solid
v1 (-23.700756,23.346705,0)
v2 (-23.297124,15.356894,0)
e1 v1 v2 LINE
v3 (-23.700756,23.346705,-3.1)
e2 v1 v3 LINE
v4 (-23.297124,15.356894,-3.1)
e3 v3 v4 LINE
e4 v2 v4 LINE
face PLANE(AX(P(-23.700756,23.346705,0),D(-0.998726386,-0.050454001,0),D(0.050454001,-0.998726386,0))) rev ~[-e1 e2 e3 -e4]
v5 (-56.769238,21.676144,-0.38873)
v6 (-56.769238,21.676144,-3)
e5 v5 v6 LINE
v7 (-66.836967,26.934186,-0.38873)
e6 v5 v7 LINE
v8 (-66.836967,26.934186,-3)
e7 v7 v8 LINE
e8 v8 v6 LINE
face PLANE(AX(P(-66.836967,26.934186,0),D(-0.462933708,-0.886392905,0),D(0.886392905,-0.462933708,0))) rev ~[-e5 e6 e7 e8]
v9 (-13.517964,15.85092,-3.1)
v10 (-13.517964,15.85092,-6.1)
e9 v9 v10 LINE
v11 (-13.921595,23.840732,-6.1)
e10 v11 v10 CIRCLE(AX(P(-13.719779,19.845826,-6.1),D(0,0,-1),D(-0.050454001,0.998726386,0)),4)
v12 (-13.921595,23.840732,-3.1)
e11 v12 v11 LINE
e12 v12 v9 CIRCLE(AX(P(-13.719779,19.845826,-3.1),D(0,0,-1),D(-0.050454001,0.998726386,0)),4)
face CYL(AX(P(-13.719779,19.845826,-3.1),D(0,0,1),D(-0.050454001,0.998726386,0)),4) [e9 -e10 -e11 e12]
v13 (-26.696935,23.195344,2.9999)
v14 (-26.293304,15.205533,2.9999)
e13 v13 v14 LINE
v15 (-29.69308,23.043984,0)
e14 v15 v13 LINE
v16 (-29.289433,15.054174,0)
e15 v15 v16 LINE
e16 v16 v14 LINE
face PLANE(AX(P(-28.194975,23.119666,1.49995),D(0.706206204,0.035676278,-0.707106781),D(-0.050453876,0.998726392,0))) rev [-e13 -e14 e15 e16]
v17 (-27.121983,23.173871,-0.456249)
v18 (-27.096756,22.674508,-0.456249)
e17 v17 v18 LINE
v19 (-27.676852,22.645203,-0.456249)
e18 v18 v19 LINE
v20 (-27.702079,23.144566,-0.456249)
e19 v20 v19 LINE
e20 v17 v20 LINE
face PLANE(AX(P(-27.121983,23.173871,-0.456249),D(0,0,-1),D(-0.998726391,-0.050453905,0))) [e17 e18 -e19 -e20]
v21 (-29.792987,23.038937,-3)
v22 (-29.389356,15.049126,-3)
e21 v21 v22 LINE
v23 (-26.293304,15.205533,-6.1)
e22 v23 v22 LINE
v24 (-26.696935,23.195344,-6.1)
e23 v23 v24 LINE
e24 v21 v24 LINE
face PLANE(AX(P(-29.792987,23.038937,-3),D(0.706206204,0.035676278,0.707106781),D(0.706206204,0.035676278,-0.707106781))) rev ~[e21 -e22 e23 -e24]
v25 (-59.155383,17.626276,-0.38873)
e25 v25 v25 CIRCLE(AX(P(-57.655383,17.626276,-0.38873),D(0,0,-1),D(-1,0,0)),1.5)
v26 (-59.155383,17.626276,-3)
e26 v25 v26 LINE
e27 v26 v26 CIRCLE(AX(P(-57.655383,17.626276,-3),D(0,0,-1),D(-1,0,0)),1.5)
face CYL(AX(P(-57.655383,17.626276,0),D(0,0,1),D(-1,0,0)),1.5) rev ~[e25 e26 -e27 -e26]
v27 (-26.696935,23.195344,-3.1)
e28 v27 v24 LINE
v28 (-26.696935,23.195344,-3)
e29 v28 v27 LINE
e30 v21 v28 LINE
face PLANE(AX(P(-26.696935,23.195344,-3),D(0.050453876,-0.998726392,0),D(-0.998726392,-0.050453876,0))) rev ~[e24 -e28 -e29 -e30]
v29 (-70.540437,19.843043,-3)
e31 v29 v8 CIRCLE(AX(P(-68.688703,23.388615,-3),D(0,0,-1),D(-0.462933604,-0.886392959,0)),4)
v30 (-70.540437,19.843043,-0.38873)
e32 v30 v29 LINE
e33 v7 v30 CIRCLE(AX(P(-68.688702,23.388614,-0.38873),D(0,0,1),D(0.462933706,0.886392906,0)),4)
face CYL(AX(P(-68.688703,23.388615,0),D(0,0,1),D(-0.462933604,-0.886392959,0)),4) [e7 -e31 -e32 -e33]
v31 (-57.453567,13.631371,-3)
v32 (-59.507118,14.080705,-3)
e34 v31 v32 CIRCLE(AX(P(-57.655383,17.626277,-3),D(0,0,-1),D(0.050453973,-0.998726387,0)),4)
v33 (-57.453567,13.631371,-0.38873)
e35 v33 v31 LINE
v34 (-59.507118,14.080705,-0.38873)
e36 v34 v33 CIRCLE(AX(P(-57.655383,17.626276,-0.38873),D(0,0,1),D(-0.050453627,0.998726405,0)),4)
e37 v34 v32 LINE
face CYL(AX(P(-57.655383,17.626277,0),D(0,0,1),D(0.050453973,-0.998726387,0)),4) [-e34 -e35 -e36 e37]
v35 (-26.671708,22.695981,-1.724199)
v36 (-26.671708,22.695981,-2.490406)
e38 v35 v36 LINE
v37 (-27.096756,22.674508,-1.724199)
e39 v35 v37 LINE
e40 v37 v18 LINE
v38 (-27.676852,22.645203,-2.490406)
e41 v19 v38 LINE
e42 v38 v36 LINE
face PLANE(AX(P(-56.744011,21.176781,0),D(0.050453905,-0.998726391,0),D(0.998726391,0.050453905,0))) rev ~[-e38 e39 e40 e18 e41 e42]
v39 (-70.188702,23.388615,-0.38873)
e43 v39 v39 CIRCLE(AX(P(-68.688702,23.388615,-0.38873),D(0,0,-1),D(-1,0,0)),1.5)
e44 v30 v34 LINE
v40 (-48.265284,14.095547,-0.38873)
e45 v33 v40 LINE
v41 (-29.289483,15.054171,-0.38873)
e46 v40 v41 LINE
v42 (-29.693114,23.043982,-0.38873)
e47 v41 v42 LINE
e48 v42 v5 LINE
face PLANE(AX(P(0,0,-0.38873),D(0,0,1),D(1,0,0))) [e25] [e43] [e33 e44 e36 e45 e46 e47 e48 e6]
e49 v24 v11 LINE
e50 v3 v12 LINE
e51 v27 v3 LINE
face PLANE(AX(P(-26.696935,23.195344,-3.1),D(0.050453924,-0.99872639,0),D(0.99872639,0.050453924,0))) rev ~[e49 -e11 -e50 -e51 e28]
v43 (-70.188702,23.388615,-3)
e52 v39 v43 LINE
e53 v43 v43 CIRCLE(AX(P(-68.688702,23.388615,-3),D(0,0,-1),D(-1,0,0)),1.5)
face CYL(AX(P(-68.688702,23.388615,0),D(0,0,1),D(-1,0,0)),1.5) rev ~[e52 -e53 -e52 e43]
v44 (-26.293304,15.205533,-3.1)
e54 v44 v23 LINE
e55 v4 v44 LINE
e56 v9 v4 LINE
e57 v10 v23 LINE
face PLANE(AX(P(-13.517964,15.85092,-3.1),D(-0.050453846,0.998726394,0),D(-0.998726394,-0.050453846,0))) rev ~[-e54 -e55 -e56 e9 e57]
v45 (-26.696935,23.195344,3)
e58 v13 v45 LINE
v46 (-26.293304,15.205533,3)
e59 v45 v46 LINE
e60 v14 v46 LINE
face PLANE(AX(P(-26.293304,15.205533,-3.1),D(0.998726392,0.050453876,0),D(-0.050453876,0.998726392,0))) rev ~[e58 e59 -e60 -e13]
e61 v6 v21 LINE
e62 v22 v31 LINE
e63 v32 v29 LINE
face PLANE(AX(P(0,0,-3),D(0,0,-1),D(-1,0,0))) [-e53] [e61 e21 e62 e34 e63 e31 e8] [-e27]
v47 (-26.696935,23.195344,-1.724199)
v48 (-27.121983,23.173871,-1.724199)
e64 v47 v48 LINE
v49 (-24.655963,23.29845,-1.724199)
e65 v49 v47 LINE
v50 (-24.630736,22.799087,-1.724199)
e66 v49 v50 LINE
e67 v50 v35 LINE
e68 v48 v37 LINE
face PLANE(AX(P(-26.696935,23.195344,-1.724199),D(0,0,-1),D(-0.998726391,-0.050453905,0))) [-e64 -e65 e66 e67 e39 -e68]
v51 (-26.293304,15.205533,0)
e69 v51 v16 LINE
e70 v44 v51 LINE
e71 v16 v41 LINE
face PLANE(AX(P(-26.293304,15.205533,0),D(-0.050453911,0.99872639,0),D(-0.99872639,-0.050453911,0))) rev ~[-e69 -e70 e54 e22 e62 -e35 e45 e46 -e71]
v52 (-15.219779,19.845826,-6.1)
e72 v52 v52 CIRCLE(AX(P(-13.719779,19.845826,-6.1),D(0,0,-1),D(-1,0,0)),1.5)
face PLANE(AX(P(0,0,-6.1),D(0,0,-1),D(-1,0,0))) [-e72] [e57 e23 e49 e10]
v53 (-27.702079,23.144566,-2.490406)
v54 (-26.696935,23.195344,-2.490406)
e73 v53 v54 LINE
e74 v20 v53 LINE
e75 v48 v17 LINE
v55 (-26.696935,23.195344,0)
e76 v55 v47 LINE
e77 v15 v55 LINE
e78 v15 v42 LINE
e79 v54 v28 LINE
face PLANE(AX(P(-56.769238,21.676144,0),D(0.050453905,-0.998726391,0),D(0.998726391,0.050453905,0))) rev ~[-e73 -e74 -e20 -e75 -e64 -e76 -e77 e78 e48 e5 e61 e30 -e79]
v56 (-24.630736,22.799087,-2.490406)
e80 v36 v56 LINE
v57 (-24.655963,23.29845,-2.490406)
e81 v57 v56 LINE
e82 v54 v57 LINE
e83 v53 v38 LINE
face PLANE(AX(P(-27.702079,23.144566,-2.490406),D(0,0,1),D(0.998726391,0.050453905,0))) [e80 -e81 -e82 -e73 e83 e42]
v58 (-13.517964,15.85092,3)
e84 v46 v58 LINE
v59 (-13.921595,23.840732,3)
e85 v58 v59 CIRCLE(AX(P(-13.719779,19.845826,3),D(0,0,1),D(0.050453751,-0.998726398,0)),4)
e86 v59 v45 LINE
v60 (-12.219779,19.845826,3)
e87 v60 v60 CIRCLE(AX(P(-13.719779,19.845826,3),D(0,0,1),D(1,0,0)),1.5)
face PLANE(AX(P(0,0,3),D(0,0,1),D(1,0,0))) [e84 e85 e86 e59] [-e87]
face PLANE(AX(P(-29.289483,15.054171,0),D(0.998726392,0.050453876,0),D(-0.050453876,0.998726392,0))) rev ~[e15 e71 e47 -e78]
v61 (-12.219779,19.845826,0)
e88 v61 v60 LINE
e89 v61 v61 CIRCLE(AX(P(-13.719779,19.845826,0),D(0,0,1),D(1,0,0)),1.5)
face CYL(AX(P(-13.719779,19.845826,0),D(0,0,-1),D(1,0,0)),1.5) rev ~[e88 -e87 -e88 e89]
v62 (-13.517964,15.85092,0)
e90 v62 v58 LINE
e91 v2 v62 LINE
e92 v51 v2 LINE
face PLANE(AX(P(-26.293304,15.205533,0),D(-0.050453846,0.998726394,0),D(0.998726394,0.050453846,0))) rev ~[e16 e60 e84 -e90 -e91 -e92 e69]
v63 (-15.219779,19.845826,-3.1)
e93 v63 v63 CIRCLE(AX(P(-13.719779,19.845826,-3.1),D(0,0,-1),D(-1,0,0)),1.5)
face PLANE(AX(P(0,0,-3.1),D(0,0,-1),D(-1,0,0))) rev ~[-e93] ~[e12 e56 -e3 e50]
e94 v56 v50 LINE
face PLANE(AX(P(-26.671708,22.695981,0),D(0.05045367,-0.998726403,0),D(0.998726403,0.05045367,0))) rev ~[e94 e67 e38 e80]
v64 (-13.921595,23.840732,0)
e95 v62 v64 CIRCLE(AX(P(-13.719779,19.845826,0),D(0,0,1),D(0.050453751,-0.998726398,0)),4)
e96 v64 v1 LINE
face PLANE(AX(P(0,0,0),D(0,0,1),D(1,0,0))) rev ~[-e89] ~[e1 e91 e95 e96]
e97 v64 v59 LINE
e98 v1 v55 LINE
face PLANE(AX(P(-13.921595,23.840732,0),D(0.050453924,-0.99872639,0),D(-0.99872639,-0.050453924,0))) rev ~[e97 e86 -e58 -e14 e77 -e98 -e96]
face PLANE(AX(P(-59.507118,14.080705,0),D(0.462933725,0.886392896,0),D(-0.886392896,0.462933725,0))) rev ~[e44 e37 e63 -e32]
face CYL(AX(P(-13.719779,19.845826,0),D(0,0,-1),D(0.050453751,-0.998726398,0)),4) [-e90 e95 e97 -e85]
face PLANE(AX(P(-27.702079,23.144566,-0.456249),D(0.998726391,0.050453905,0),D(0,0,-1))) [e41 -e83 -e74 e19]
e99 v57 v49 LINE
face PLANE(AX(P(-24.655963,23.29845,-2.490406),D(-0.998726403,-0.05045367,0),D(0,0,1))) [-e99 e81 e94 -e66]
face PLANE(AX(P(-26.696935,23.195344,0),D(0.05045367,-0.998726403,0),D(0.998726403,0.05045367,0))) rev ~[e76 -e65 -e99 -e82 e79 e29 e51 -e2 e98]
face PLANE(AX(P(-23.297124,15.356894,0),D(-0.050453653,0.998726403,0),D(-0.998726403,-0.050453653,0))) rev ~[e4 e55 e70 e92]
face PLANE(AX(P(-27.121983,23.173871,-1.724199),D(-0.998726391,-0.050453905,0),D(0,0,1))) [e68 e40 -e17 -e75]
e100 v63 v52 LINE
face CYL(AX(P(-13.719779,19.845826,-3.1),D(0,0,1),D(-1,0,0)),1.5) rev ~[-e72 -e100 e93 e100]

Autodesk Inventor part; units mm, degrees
ref_plane "YZ Plane" through (0, 0, 0) normal (1, 0, 0) x (0, 1, 0)
ref_plane "XZ Plane" through (0, 0, 0) normal (0, 1, 0) x (-1, 0, 0)
sketch "Sketch1" plane through (0, 0, 0) normal (0, 0, 1) x (1, 0, 0)
  line L0 (-26.293304, 15.205533) -> (-26.696935, 23.195344)
  line L1 (-26.696935, 23.195344) -> (-13.921595, 23.840732)
  arc A0 (-13.517964, 15.85092) -> (-13.921595, 23.840732) centre (-13.719779, 19.845826) ccw
  line L2 (-13.517964, 15.85092) -> (-26.293304, 15.205533)
  circle A1 centre (-13.719779, 19.845826) radius 1.5
  point P0 (0, 0)
sketch "Sketch1 outline for Extrusion1" plane through (0, 0, 0) normal (0, 0, 1) x (1, 0, 0)
  arc A0 (-13.517964, 15.85092) -> (-13.921595, 23.840732) centre (-13.719779, 19.845826) ccw
  line L0 (-26.293304, 15.205533) -> (-13.517964, 15.85092)
  line L1 (-13.921595, 23.840732) -> (-26.696935, 23.195344)
  line L2 (-26.696935, 23.195344) -> (-26.293304, 15.205533)
  circle A1 centre (-13.719779, 19.845826) radius 1.5
extrude "Extrusion1" add sketch "Sketch1 outline for Extrusion1" along normal blind 3
sketch "Sketch2" plane through (0, 0, 0) normal (0, 0, -1) x (-1, 0, 0)
  line L0 (23.700756, 23.346705) -> (23.297124, 15.356894)
  line L1 (26.696935, 23.195344) -> (26.293304, 15.205533)
  line L2 (13.921595, 23.840732) -> (26.696935, 23.195344)
  arc A0 (13.921595, 23.840732) -> (13.517964, 15.85092) centre (13.719779, 19.845826) ccw
  line L3 (26.293304, 15.205533) -> (13.517964, 15.85092)
  line L4 (26.696935, 23.195344) -> (26.293304, 15.205533)
  circle A1 centre (13.719779, 19.845826) radius 1.5
  point P0 (0, 0)
sketch "Sketch2 outline for Extrusion2" plane through (0, 0, 0) normal (0, 0, -1) x (-1, 0, 0)
  line L0 (23.297124, 15.356894) -> (26.293304, 15.205533)
  line L1 (23.700756, 23.346705) -> (23.297124, 15.356894)
  line L2 (26.696935, 23.195344) -> (23.700756, 23.346705)
  line L3 (26.293304, 15.205533) -> (26.696935, 23.195344)
extrude "Extrusion2" add sketch "Sketch2 outline for Extrusion2" along normal blind 3.1
sketch "Sketch3" plane through (0, 0, -3.1) normal (0, 0, -1) x (-1, 0, 0)
  line L0 (13.921595, 23.840732) -> (26.696935, 23.195344)
  line L1 (26.696935, 23.195344) -> (26.293304, 15.205533)
  line L2 (26.293304, 15.205533) -> (13.517964, 15.85092)
  arc A0 (13.921595, 23.840732) -> (13.517964, 15.85092) centre (13.719779, 19.845826) ccw
  circle A1 centre (13.719779, 19.845826) radius 1.5
  point P0 (0, 0)
sketch "Sketch3 outline for Extrusion3" plane through (0, 0, -3.1) normal (0, 0, -1) x (-1, 0, 0)
  arc A0 (13.921595, 23.840732) -> (13.517964, 15.85092) centre (13.719779, 19.845826) ccw
  line L0 (26.696935, 23.195344) -> (13.921595, 23.840732)
  line L1 (13.517964, 15.85092) -> (26.293304, 15.205533)
  line L2 (26.293304, 15.205533) -> (26.696935, 23.195344)
  circle A1 centre (13.719779, 19.845826) radius 1.5
extrude "Extrusion3" add sketch "Sketch3 outline for Extrusion3" along normal blind 3
sketch "Sketch4" plane through (0, 0, 0) normal (0, 0, -1) x (-1, 0, 0)
  arc A0 (57.453567, 13.631371) -> (57.857198, 21.621182) centre (57.655383, 17.626276) ccw
  line L0 (57.453567, 13.631371) -> (29.389355, 15.049125)
  line L1 (29.792987, 23.038937) -> (29.389355, 15.049125)
  line L2 (29.792987, 23.038937) -> (57.857198, 21.621182)
  circle A1 centre (57.655383, 17.626276) radius 1.5
  line L3 (29.389355, 15.049125) -> (26.293304, 15.205533)
  line L4 (26.696935, 23.195344) -> (26.293304, 15.205533)
  line L5 (26.696935, 23.195344) -> (29.792987, 23.038937)
  line L6 (29.792987, 23.038937) -> (29.389355, 15.049125)
  circle A2 centre (68.688702, 23.388615) radius 1.5
  arc A3 (70.540437, 19.843043) -> (66.836967, 26.934186) centre (68.688702, 23.388615) ccw
  line L7 (59.507118, 14.080705) -> (70.540437, 19.843043)
  arc A4 (57.453567, 13.631371) -> (57.857198, 21.621182) centre (57.655383, 17.626276) ccw
  line L8 (56.769238, 21.676144) -> (66.836967, 26.934186)
  point P0 (0, 0)
  dimension "d18" = 8
sketch "Sketch4 outline for Extrusion4" plane through (0, 0, 0) normal (0, 0, -1) x (-1, 0, 0)
  line L0 (26.696935, 23.195344) -> (26.293304, 15.205533)
  line L1 (26.293304, 15.205533) -> (57.453567, 13.631371)
  arc A0 (57.453567, 13.631371) -> (59.507118, 14.080705) centre (57.655383, 17.626276) ccw
  line L2 (59.507118, 14.080705) -> (70.540437, 19.843043)
  arc A1 (70.540437, 19.843043) -> (66.836967, 26.934186) centre (68.688702, 23.388615) ccw
  line L3 (66.836967, 26.934186) -> (56.769238, 21.676144)
  line L4 (56.769238, 21.676144) -> (26.696935, 23.195344)
  circle A2 centre (57.655383, 17.626276) radius 1.5
  circle A3 centre (68.688702, 23.388615) radius 1.5
extrude "Extrusion4" add sketch "Sketch4 outline for Extrusion4" along normal blind 3
chamfer "Chamfer1" distance 3 angle 45 1 edges at (-26.4951, 19.2004, 0)
chamfer "Chamfer2" distance 3.1 angle 45 1 edges at (-26.4951, 19.2004, -3)
ref_plane "Work Plane1" through (-62.942605, 1.312432, -0.38873) normal (0, 0, -1) x (-0.0504539, 0.9987264, 0)
sketch "Sketch6" plane through (0, 0, 0) normal (0, 0, 1) x (1, 0, 0)
  line L0 (-57.453567, 13.631371) -> (-48.265284, 14.095547)
  arc A0 (-57.857198, 21.621182) -> (-57.453567, 13.631371) centre (-57.655383, 17.626276) ccw
  line L1 (-29.693114, 23.043982) -> (-57.857198, 21.621182)
  line L2 (-29.693114, 23.043982) -> (-48.265284, 14.095547)
  circle A1 centre (-57.655383, 17.626276) radius 1.5
  point P0 (0, 0)
sketch "Sketch6 outline for Extrusion5" plane through (0, 0, 0) normal (0, 0, 1) x (1, 0, 0)
  line L0 (-29.693114, 23.043982) -> (-57.857198, 21.621182)
  line L1 (-48.265284, 14.095547) -> (-29.693114, 23.043982)
  arc A0 (-57.857198, 21.621182) -> (-57.453567, 13.631371) centre (-57.655383, 17.626276) ccw
  line L2 (-57.453567, 13.631371) -> (-48.265284, 14.095547)
  circle A1 centre (-57.655383, 17.626276) radius 1.5
extrude "Extrusion5" cut sketch "Sketch6 outline for Extrusion5" against normal up to surface (0.38873 mm away)
sketch "Sketch7" plane through (-13.921595, 23.840732, 3) normal (-0.0504539, 0.9987264, 0) x (0.9987264, 0.0504539, 0)
  line L0 (-10.748057, 5.806776) -> (-10.748057, 3.406816) construction
  line L1 (-10.748057, 3.406816) -> (-13.798057, 3.406816) construction
  line L2 (-13.798057, 3.406816) -> (-13.798057, 5.806776) construction
  line L3 (-13.798057, 5.806776) -> (-10.748057, 5.806776) construction
  line L4 (-13.798057, 3.456249) -> (-13.798057, 5.490406)
  line L5 (-13.798057, 5.490406) -> (-10.748057, 5.490406)
  line L6 (-10.748057, 5.490406) -> (-10.748057, 4.724199)
  line L7 (-10.748057, 4.724199) -> (-13.217222, 4.724199)
  line L8 (-13.217222, 4.724199) -> (-13.217222, 3.456249)
  line L9 (-13.217222, 3.456249) -> (-13.798057, 3.456249)
  point P0 (12.701006, 3)
sketch "Sketch7 outline for Emboss1" plane through (-13.921595, 23.840732, 3) normal (-0.0504539, 0.9987264, 0) x (0.9987264, 0.0504539, 0)
  line L0 (-13.798057, 3.456249) -> (-13.798057, 5.490406)
  line L1 (-13.798057, 5.490406) -> (-10.748057, 5.490406)
  line L2 (-10.748057, 5.490406) -> (-10.748057, 4.724199)
  line L3 (-10.748057, 4.724199) -> (-13.217222, 4.724199)
  line L4 (-13.217222, 4.724199) -> (-13.217222, 3.456249)
  line L5 (-13.217222, 3.456249) -> (-13.798057, 3.456249)
emboss "Emboss1" sketch "Sketch7 outline for Emboss1" operation cut depth 0.5 direction (0.0504539, -0.9987264, 0)
sketch "Sketch8" plane through (0, 0, 0) normal (0, 0, 1) x (1, 0, 0)
  line L0 (-57.857198, 21.621182) -> (-56.769238, 21.676144)
  line L1 (-66.836967, 26.934186) -> (-56.769238, 21.676144)
  arc A0 (-66.836967, 26.934186) -> (-70.540437, 19.843043) centre (-68.688702, 23.388615) ccw
  line L2 (-59.507118, 14.080705) -> (-70.540437, 19.843043)
  arc A1 (-57.857198, 21.621182) -> (-59.507118, 14.080705) centre (-57.655383, 17.626276) ccw
  circle A2 centre (-68.688702, 23.388615) radius 1.5
  point P0 (0, 0)
sketch "Sketch8 outline for Extrusion6" plane through (0, 0, 0) normal (0, 0, 1) x (1, 0, 0)
  arc A0 (-59.507118, 14.080705) -> (-57.857198, 21.621182) centre (-57.655383, 17.626276) cw
  line L0 (-70.540437, 19.843043) -> (-59.507118, 14.080705)
  line L1 (-57.857198, 21.621182) -> (-56.769238, 21.676144)
  arc A1 (-66.836967, 26.934186) -> (-70.540437, 19.843043) centre (-68.688702, 23.388615) ccw
  line L2 (-56.769238, 21.676144) -> (-66.836967, 26.934186)
  circle A2 centre (-68.688702, 23.388615) radius 1.5
extrude "Extrusion6" cut sketch "Sketch8 outline for Extrusion6" against normal up to surface (0.38873 mm away)
sketch "Sketch9" plane through (0, 0, 0) normal (0, 0, 1) x (1, 0, 0)
  line L0 (-29.693114, 23.043982) -> (-48.265284, 14.095547)
  line L1 (-29.289483, 15.054171) -> (-48.265284, 14.095547)
  line L2 (-29.693114, 23.043982) -> (-29.289483, 15.054171)
  point P0 (0, 0)
sketch "Sketch9 outline for Extrusion7" plane through (0, 0, 0) normal (0, 0, 1) x (1, 0, 0)
  line L0 (-29.289483, 15.054171) -> (-29.693114, 23.043982)
  line L1 (-48.265284, 14.095547) -> (-29.289483, 15.054171)
  line L2 (-29.693114, 23.043982) -> (-48.265284, 14.095547)
extrude "Extrusion7" cut sketch "Sketch9 outline for Extrusion7" against normal up to surface (0.38873 mm away)
properties part number "GripperShaftLeft_3DPrint"
